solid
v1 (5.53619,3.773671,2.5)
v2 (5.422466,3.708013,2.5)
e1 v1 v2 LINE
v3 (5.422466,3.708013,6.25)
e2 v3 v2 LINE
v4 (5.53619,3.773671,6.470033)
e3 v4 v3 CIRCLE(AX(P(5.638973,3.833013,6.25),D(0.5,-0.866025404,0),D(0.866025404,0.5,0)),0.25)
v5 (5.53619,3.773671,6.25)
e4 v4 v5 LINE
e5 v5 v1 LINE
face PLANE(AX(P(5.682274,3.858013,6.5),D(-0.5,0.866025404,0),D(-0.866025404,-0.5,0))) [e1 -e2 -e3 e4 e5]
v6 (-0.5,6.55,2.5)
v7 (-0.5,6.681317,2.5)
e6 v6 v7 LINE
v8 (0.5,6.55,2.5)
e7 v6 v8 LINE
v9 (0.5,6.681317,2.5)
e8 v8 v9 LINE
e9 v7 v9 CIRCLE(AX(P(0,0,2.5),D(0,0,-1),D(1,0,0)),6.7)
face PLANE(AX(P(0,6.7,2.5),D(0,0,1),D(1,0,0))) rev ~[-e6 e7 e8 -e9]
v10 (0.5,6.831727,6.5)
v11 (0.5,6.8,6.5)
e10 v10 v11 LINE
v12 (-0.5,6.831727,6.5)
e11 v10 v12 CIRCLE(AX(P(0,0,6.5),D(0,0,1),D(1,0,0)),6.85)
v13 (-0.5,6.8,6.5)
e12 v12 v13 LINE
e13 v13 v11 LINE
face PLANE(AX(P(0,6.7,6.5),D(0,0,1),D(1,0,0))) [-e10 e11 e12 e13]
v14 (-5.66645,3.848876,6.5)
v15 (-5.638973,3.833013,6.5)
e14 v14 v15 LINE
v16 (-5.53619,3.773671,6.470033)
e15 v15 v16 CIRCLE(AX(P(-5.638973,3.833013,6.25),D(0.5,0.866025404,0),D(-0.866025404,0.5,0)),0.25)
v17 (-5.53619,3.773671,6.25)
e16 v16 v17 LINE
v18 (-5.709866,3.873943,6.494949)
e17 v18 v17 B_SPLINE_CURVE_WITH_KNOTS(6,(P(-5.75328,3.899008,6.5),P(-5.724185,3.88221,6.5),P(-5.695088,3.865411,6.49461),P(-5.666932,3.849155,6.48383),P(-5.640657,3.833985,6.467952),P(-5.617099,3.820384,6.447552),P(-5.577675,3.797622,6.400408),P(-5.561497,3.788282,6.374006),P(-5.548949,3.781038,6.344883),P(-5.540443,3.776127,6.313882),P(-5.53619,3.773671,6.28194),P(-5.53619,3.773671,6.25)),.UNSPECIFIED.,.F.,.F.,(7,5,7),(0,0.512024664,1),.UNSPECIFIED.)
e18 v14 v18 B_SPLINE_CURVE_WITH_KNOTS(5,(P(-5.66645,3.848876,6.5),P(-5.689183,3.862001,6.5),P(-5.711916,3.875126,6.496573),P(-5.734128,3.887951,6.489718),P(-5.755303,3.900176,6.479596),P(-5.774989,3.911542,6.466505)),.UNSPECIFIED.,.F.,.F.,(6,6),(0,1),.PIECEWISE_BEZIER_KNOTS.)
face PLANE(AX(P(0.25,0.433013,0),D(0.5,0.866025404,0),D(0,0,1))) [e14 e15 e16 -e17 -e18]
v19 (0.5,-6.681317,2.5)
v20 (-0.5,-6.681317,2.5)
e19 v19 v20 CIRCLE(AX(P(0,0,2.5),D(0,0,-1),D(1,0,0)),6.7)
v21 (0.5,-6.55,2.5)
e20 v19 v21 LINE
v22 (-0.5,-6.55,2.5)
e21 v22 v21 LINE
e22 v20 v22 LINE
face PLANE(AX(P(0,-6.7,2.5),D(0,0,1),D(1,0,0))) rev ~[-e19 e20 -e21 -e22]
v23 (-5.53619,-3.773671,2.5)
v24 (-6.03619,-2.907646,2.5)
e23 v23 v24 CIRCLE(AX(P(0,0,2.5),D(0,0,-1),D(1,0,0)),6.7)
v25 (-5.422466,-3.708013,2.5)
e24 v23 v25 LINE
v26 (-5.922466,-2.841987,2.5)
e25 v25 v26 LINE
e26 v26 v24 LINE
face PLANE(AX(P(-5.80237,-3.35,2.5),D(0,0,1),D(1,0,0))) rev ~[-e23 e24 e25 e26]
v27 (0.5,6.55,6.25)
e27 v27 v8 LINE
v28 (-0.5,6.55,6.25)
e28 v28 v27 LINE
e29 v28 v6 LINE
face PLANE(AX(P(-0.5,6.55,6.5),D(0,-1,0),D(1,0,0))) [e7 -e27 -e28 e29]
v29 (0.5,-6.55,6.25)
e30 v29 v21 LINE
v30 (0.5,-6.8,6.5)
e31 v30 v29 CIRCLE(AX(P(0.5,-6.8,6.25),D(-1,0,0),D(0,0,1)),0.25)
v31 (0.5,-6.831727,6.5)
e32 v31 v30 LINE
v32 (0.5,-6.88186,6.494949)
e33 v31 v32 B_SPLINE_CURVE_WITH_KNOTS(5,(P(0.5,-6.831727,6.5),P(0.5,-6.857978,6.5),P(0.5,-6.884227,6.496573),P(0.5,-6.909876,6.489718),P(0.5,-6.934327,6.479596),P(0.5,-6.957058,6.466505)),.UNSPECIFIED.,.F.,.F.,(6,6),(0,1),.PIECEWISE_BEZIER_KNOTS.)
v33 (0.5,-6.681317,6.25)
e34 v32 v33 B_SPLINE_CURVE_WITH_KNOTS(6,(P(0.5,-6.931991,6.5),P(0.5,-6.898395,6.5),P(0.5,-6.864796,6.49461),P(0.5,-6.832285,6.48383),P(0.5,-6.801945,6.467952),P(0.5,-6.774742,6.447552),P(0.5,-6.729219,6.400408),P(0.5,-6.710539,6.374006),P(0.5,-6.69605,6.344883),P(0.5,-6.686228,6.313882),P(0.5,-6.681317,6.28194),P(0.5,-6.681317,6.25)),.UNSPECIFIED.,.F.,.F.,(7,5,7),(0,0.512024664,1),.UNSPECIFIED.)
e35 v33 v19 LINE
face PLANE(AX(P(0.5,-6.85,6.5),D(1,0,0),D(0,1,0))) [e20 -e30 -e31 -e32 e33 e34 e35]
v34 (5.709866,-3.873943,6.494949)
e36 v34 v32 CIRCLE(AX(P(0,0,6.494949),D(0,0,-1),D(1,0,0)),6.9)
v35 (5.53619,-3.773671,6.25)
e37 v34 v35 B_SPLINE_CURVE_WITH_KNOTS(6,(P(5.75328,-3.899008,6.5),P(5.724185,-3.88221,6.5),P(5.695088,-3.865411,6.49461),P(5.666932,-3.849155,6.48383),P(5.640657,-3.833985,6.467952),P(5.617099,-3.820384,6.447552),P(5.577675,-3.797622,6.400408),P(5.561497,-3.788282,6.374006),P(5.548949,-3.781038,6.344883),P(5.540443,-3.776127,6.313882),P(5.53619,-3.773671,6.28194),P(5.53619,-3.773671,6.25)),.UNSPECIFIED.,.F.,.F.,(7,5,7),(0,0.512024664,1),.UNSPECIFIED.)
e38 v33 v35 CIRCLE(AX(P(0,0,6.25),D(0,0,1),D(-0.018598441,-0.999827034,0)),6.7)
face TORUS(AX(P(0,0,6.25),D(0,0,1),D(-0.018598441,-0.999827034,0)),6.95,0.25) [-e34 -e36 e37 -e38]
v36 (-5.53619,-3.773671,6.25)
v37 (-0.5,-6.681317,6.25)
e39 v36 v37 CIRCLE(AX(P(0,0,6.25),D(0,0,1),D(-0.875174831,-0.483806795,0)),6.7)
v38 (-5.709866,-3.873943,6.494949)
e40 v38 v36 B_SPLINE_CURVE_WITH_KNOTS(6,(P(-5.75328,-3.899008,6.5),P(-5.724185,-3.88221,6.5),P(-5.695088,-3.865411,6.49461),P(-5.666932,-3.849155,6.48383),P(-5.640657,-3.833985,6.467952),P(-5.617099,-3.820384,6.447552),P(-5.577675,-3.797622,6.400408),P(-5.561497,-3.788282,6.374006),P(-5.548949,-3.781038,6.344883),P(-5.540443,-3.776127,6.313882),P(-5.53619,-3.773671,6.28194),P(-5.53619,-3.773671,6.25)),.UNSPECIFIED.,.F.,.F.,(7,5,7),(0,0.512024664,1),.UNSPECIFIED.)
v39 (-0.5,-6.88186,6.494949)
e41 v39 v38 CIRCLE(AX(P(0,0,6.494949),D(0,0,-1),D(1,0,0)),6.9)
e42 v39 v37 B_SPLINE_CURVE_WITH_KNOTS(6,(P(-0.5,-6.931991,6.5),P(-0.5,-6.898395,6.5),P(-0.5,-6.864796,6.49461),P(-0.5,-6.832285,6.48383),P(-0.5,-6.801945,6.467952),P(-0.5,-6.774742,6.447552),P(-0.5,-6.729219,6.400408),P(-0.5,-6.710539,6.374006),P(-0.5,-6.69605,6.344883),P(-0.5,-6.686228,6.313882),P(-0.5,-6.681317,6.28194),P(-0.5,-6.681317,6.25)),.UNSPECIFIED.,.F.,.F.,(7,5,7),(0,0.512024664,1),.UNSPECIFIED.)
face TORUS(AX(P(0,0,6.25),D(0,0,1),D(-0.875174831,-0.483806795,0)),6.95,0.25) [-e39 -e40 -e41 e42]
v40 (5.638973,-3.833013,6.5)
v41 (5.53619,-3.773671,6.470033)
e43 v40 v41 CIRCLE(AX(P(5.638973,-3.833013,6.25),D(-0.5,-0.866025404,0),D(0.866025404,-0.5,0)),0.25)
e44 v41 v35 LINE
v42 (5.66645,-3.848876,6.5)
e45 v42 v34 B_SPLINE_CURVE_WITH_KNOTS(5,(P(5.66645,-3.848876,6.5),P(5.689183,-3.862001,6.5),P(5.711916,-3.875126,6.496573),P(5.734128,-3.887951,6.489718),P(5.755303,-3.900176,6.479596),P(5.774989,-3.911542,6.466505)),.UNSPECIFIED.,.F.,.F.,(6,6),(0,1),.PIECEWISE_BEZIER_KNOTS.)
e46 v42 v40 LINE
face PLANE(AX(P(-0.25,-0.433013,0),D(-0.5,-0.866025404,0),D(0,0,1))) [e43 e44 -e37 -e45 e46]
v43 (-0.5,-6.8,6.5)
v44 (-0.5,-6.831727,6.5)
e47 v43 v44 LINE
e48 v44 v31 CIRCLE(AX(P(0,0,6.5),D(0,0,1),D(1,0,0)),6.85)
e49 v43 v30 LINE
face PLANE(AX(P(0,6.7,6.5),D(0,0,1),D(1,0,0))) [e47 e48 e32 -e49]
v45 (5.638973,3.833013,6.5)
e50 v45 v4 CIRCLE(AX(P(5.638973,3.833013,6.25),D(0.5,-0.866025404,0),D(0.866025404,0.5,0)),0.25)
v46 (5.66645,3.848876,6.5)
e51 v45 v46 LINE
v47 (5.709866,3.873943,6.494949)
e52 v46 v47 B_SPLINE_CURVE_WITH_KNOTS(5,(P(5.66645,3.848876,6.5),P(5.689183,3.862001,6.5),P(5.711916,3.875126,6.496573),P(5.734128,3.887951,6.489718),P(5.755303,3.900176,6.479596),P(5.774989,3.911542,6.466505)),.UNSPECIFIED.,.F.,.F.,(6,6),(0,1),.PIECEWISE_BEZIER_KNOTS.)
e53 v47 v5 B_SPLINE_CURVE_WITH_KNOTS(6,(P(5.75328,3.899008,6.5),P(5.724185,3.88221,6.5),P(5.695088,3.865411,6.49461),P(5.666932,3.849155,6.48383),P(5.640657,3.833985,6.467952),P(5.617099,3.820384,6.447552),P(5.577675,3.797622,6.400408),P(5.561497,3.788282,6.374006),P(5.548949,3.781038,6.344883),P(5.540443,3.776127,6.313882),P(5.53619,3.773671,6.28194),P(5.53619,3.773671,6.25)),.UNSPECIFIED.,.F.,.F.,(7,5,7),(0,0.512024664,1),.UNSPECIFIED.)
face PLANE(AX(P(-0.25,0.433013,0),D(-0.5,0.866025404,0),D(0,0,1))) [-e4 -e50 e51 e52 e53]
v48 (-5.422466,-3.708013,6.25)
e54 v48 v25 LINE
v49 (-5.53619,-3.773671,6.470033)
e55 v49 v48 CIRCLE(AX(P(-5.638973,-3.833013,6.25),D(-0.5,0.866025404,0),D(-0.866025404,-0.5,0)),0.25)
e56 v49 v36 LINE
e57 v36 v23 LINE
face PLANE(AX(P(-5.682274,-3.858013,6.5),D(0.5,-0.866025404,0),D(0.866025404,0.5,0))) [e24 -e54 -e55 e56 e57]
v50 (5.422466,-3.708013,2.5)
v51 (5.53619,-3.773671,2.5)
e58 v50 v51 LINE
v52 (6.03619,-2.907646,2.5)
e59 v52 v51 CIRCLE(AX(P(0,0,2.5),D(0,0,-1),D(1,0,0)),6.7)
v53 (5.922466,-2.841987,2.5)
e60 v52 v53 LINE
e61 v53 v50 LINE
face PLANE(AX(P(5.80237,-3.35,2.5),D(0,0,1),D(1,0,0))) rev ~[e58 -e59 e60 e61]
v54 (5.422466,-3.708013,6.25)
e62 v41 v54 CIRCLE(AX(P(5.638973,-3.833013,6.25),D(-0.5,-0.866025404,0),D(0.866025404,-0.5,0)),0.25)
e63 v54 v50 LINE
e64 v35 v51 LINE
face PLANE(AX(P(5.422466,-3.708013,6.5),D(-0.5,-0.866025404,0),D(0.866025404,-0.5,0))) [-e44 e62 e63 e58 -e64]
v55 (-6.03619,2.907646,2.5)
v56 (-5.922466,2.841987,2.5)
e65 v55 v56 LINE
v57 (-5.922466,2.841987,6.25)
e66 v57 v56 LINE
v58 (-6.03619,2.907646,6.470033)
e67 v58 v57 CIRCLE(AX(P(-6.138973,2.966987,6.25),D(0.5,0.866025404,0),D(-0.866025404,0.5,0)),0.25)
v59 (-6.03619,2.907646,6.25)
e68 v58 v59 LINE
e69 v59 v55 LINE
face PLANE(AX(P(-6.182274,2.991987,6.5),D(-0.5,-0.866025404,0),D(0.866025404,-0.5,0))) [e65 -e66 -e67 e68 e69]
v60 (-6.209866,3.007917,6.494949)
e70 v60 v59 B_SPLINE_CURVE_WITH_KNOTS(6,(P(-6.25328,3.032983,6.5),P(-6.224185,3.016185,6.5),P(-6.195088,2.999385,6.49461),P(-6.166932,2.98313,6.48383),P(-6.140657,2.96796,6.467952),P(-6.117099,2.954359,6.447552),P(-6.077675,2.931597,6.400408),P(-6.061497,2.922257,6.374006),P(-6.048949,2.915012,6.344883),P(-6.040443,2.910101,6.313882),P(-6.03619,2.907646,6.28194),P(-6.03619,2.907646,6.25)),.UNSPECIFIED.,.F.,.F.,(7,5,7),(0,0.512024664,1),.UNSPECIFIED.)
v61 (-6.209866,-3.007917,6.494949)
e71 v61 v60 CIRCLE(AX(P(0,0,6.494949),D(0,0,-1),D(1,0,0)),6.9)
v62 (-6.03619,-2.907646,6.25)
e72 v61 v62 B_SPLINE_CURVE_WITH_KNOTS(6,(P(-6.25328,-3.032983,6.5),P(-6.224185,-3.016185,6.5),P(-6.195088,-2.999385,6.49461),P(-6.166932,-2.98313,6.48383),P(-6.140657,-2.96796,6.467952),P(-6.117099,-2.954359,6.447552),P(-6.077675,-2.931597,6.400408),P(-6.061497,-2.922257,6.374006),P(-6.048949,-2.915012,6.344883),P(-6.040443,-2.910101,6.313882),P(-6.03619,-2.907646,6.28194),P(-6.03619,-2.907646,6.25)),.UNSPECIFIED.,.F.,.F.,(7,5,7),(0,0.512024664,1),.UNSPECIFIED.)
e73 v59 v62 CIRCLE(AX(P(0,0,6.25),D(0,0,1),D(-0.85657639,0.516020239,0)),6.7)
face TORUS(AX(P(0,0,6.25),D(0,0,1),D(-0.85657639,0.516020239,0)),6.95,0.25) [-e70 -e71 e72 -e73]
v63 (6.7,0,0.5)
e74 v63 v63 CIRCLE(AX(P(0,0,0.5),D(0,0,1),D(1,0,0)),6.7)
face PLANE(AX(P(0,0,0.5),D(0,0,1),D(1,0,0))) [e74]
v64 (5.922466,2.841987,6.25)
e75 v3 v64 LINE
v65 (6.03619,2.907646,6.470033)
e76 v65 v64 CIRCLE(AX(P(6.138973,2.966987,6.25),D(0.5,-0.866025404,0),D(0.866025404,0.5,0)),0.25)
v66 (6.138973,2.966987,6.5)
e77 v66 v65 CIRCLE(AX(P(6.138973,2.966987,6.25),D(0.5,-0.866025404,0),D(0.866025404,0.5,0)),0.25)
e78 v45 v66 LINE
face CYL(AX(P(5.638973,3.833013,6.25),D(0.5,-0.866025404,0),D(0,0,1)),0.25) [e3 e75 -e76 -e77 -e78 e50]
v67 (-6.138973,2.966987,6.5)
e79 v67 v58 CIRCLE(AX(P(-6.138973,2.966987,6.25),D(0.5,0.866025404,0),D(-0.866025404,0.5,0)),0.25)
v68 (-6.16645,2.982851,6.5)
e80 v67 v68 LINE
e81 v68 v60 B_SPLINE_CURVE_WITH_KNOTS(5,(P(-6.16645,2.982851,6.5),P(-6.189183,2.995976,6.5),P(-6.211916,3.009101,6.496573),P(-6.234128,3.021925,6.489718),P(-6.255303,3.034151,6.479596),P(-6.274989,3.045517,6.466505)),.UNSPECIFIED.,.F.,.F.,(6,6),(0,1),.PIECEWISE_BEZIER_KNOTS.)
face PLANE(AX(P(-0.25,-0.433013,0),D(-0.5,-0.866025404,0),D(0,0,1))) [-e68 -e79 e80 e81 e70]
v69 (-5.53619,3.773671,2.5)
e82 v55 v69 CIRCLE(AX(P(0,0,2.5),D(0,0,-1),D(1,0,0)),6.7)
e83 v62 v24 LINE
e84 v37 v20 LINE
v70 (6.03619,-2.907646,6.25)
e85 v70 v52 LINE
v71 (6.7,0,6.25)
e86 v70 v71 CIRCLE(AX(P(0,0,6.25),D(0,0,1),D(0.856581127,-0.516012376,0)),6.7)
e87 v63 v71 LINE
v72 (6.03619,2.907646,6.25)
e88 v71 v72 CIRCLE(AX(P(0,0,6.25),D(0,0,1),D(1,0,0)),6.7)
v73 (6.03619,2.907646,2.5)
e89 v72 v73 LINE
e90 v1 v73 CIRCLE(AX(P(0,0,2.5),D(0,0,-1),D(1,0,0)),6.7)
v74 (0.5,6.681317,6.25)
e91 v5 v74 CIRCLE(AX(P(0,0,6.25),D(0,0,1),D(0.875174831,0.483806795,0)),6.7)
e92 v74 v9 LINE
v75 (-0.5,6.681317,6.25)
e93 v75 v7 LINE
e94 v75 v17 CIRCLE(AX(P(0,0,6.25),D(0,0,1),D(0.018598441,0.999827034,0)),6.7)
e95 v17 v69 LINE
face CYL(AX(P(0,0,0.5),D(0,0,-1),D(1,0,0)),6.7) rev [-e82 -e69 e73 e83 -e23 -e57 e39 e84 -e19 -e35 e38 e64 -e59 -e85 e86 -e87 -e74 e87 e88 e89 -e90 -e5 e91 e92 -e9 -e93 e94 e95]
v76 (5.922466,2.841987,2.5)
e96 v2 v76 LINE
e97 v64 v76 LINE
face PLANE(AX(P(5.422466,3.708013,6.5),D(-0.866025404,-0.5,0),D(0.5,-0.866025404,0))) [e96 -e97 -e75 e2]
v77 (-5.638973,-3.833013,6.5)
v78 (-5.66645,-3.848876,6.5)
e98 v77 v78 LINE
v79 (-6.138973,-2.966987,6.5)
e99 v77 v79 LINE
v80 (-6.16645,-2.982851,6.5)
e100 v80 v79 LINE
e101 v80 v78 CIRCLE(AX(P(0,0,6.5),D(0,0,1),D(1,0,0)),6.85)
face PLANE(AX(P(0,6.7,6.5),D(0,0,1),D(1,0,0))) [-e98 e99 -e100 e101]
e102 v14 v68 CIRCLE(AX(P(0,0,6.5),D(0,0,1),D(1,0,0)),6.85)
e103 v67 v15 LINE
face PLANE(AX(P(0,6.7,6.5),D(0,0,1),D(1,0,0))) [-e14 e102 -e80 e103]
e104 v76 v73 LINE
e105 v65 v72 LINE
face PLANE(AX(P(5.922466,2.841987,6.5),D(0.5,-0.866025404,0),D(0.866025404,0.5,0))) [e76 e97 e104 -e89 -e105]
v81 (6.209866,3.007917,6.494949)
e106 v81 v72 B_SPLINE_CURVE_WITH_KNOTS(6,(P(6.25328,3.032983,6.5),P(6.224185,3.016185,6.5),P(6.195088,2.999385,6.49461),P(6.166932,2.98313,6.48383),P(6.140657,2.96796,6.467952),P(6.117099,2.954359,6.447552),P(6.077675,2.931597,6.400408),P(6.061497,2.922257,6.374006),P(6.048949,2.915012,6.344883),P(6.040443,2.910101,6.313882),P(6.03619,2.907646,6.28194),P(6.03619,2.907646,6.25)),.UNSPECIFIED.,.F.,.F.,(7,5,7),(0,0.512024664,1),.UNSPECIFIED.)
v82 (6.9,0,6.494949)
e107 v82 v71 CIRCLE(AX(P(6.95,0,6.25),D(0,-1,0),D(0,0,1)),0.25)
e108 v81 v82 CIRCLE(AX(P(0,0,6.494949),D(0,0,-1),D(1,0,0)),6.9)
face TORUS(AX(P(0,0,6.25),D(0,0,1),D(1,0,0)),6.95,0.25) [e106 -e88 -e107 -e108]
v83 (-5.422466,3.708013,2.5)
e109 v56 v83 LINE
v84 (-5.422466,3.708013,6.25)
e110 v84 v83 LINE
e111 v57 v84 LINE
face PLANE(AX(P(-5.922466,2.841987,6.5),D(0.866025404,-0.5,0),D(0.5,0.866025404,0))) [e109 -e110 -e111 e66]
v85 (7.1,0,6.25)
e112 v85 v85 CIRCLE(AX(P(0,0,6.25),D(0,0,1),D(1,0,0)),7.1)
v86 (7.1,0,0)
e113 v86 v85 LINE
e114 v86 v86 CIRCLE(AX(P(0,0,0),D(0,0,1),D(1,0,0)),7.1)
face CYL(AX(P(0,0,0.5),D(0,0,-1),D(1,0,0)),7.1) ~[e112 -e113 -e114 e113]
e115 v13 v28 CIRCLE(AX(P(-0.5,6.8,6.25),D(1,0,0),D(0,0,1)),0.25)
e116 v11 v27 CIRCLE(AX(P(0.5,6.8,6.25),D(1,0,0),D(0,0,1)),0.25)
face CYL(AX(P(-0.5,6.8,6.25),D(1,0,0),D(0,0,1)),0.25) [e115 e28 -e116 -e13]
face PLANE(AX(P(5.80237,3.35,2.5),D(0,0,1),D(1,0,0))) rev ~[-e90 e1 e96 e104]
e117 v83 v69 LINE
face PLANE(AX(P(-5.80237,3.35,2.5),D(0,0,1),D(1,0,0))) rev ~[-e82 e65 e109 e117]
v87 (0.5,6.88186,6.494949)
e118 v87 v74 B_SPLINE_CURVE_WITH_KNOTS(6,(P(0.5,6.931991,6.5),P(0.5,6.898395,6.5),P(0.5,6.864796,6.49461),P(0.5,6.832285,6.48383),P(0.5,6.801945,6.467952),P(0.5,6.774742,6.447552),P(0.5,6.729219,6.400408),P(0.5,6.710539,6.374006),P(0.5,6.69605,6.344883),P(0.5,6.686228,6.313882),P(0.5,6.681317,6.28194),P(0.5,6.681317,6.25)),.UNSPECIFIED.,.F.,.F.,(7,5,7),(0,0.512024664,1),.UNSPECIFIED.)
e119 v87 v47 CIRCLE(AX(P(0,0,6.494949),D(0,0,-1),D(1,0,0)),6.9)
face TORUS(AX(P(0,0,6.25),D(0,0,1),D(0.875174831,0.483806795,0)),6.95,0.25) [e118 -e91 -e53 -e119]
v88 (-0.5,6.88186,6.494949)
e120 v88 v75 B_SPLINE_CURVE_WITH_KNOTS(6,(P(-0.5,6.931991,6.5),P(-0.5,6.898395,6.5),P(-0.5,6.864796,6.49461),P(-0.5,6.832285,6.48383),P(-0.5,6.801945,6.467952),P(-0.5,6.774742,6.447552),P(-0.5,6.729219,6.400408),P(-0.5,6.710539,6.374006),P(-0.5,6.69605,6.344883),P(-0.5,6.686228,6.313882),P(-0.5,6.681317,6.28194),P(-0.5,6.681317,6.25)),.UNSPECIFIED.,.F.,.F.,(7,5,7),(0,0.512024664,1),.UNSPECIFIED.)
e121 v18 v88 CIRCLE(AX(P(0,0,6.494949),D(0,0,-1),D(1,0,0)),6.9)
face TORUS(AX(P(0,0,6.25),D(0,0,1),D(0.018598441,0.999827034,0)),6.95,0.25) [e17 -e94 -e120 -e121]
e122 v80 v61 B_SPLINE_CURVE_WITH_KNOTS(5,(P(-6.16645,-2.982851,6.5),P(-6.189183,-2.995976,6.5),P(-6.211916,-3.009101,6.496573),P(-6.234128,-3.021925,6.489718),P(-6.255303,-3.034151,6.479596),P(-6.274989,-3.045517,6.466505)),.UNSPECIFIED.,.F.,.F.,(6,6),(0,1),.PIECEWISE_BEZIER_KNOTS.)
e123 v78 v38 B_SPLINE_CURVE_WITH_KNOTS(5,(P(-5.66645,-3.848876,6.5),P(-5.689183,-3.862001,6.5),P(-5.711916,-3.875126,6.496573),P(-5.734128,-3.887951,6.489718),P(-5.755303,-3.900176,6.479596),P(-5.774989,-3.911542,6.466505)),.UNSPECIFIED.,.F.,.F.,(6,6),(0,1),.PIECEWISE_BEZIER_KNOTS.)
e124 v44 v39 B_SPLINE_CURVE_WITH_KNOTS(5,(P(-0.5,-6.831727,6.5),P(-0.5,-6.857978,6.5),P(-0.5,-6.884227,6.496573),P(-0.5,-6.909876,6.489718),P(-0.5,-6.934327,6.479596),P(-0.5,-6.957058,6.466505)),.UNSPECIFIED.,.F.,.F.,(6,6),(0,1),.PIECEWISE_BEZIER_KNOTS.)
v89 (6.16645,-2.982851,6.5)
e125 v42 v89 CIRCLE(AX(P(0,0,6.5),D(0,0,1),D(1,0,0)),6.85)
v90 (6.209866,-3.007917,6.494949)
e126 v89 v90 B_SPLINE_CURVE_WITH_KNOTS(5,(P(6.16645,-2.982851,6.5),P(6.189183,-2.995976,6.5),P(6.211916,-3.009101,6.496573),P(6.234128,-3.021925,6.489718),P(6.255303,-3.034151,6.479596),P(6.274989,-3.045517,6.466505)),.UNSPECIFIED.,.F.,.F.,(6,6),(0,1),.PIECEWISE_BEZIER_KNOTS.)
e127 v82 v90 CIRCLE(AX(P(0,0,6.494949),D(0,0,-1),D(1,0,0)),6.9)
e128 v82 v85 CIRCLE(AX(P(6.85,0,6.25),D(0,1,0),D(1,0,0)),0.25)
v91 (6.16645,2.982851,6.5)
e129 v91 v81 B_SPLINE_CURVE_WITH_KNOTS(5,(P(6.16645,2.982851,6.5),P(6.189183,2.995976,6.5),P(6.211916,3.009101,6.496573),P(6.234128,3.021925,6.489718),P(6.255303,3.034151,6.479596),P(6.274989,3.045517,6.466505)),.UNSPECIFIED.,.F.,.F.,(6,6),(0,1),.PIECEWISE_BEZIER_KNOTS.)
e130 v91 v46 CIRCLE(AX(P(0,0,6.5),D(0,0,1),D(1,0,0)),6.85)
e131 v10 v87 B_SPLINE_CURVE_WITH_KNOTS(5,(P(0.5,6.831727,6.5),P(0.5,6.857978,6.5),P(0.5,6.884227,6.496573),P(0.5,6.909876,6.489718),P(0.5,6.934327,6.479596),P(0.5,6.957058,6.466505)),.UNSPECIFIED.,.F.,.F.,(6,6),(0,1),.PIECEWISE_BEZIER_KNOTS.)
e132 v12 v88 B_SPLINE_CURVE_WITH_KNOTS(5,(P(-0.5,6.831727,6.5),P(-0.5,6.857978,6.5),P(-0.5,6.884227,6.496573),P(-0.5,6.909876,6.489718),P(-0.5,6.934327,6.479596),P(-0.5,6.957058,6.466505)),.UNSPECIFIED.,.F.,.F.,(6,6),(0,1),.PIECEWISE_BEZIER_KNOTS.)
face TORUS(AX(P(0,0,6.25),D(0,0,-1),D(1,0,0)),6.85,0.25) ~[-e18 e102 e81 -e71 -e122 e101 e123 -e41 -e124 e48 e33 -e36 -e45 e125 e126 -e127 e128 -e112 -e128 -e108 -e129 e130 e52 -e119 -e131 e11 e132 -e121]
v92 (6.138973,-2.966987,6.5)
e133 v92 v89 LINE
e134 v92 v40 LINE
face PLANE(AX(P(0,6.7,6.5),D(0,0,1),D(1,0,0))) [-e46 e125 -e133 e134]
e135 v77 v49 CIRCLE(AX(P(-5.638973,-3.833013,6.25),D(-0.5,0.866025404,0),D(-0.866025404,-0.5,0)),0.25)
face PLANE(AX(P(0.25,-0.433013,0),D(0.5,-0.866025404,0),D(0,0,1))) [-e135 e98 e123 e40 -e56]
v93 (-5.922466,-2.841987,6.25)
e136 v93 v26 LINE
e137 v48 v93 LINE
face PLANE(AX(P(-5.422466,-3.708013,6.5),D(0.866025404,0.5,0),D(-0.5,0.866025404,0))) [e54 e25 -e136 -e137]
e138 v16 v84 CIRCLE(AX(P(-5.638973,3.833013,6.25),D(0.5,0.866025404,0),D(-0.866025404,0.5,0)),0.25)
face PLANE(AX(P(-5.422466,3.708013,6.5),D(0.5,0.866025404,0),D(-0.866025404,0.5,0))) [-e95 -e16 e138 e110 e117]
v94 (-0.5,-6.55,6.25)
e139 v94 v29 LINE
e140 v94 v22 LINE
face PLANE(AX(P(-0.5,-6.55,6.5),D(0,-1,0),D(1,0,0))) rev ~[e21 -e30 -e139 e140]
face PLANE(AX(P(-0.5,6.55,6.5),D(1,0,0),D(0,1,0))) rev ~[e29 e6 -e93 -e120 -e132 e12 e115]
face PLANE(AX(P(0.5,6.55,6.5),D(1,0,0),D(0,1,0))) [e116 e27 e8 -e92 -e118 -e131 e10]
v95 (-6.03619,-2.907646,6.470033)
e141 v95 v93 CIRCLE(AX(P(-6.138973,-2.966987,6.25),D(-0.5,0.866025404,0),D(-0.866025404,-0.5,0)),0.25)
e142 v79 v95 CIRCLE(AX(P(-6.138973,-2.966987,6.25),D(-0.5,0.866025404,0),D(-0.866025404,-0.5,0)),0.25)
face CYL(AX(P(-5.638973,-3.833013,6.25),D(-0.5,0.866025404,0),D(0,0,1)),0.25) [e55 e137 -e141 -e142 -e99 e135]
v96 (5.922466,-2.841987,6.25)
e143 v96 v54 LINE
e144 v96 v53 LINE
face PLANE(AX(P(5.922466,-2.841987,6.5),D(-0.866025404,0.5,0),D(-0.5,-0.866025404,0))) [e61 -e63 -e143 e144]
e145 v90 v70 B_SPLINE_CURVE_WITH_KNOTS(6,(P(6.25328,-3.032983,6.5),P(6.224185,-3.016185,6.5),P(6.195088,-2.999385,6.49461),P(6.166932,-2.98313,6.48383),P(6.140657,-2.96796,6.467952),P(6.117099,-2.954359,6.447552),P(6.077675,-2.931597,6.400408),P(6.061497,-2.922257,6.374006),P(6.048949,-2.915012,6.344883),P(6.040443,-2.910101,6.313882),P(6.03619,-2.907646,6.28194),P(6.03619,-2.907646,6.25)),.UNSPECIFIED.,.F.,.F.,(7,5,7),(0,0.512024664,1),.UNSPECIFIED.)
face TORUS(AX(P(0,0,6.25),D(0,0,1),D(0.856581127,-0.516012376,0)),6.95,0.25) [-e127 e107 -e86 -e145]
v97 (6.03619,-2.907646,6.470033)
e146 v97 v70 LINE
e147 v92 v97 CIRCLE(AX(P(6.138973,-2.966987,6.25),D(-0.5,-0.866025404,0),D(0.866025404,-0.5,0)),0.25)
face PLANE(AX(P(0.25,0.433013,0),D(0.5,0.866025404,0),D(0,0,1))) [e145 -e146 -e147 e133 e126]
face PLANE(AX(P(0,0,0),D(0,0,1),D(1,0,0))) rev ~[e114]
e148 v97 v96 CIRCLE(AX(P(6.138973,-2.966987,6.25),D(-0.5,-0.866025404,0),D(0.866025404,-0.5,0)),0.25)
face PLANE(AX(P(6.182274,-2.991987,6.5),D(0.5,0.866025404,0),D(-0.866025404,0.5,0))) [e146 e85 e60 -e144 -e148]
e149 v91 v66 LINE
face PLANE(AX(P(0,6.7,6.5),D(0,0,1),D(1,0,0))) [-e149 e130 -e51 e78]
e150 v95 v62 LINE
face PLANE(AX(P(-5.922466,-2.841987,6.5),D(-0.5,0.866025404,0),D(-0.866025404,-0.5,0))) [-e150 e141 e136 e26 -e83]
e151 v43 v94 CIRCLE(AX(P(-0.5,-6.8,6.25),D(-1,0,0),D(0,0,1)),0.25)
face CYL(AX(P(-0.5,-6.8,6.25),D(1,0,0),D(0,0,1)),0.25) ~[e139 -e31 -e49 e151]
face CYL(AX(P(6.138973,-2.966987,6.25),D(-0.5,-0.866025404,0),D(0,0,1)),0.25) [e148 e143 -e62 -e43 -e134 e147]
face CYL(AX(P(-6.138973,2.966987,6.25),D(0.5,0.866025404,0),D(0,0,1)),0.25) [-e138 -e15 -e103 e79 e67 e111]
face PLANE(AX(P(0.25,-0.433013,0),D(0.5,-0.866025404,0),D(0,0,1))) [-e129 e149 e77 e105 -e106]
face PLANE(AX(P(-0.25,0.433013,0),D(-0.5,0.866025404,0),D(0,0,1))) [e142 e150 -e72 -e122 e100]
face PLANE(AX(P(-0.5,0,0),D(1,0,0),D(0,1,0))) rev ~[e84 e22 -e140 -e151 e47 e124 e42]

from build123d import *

# Parameters (mm, degrees)
F0_R         = 7.1
F1_DEPTH     = 0.5
F2_R         = 7.1
F2_R_2       = 6.7
F3_DEPTH     = 6
F4_W         = 1
F4_H         = 0.3
F5_DEPTH     = 4
F6_R         = 0.25
F7_T4_ANGLE  = 62.1313472273
F7_T10_ANGLE = 62.1313472273
F7_T16_ANGLE = 62.1313472273
F7_T22_ANGLE = 62.1313472273
F7_T28_ANGLE = 31.0651476548
F7_T33_ANGLE = 62.1313472273
F7_T39_ANGLE = 31.0651476548
F8_R         = 0.25


# Not quite as in the source:
# - a fillet or chamfer that OpenCascade refuses, or shapes differently, is made with other operations: its cross-section is extruded or revolved along the edge and cut away or added


with BuildPart() as f1:
    # F0 (on Top) → F1 (new body)
    with BuildSketch(Plane.XY):
        Circle(F0_R)
    extrude(amount=F1_DEPTH)

    # F2 (on face) → F3 (join)
    with BuildSketch(Plane.XY.offset(0.5)):
        Circle(F2_R)
        Circle(F2_R_2, mode=Mode.SUBTRACT)
    extrude(amount=F3_DEPTH)

    # F4 (on face) → F5 (join)
    with BuildSketch(Plane.XY.offset(6.5)):
        with Locations((0, 6.7)):
            Rectangle(F4_W, F4_H)
        Polygon((-5.9224663948, 2.8419872981), (-5.4224663948, 3.7080127019), (-5.6822740159, 3.8580127019), (-6.1822740159, 2.9919872981), align=None)
        Polygon((-5.4224663948, -3.7080127019), (-5.9224663948, -2.8419872981), (-6.1822740159, -2.9919872981), (-5.6822740159, -3.8580127019), align=None)
        with Locations((0, -6.7)):
            Rectangle(F4_W, F4_H)
        Polygon((5.9224663948, -2.8419872981), (5.4224663948, -3.7080127019), (5.6822740159, -3.8580127019), (6.1822740159, -2.9919872981), align=None)
        Polygon((5.4224663948, 3.7080127019), (5.9224663948, 2.8419872981), (6.1822740159, 2.9919872981), (5.6822740159, 3.8580127019), align=None)
    extrude(amount=-F5_DEPTH)

    # F6
    f6_edges = [f1.edges().sort_by_distance(p)[0] for p in [
        (-7.1, 0, 6.5),
    ]]
    fillet(f6_edges, radius=F6_R)

    # F7: fillet of radius 0.25 on 6 edges, made by hand


with BuildPart() as f7_tool2:
    # F7_s3 → F7_t4 (revolve)
    with BuildSketch(Plane(origin=(0, 0, 0), x_dir=(0, 0, 1), z_dir=(-0.4838067947, 0.8751748313, 0))):
        with BuildLine():
            ThreePointArc((6.5, -6.95), (6.4267766953, -6.7732233047), (6.25, -6.7))
            Line((6.25, -6.7), (6.5, -6.7))
            Line((6.5, -6.7), (6.5, -6.95))
        make_face()
    revolve(axis=Axis((0, 0, 6.5), (0, 0, 1)), revolution_arc=F7_T4_ANGLE)

    split(bisect_by=Plane.YZ.offset(-0.5), keep=Keep.BOTTOM)

    split(bisect_by=Plane(origin=(0.25, -0.4330127019, 0), x_dir=(0, 0, 1), z_dir=(0.5, -0.8660254038, 0)), keep=Keep.TOP)


with BuildPart() as f1_1:
    add(f1.part)

    # F7_t1: cut F7_tool2
    add(f7_tool2.part, mode=Mode.SUBTRACT)


with BuildPart() as f7_tool8:
    # F7_s9 → F7_t10 (revolve)
    with BuildSketch(Plane(origin=(0, 0, 0), x_dir=(0, 0, 1), z_dir=(0.5160202393, 0.8565763904, 0))):
        with BuildLine():
            ThreePointArc((6.5, -6.95), (6.4267766953, -6.7732233047), (6.25, -6.7))
            Line((6.25, -6.7), (6.5, -6.7))
            Line((6.5, -6.7), (6.5, -6.95))
        make_face()
    revolve(axis=Axis((0, 0, 6.5), (0, 0, 1)), revolution_arc=F7_T10_ANGLE)

    split(bisect_by=Plane(origin=(-0.25, 0.4330127019, 0), x_dir=(0, 0, 1), z_dir=(-0.5, 0.8660254038, 0)), keep=Keep.TOP)

    split(bisect_by=Plane(origin=(-0.25, -0.4330127019, 0), x_dir=(0, 0, 1), z_dir=(-0.5, -0.8660254038, 0)), keep=Keep.TOP)


with BuildPart() as f1_2:
    add(f1_1.part)

    # F7_t7: cut F7_tool8
    add(f7_tool8.part, mode=Mode.SUBTRACT)


with BuildPart() as f7_tool14:
    # F7_s15 → F7_t16 (revolve)
    with BuildSketch(Plane(origin=(0, 0, 0), x_dir=(0, 0, 1), z_dir=(0.999827034, -0.0185984409, 0))):
        with BuildLine():
            ThreePointArc((6.5, -6.95), (6.4267766953, -6.7732233047), (6.25, -6.7))
            Line((6.25, -6.7), (6.5, -6.7))
            Line((6.5, -6.7), (6.5, -6.95))
        make_face()
    revolve(axis=Axis((0, 0, 6.5), (0, 0, 1)), revolution_arc=F7_T16_ANGLE)

    split(bisect_by=Plane(origin=(0.25, 0.4330127019, 0), x_dir=(0, 0, 1), z_dir=(0.5, 0.8660254038, 0)), keep=Keep.TOP)

    split(bisect_by=Plane.YZ.offset(-0.5), keep=Keep.BOTTOM)


with BuildPart() as f1_3:
    add(f1_2.part)

    # F7_t13: cut F7_tool14
    add(f7_tool14.part, mode=Mode.SUBTRACT)


with BuildPart() as f7_tool20:
    # F7_s21 → F7_t22 (revolve)
    with BuildSketch(Plane(origin=(0, 0, 0), x_dir=(0, 0, 1), z_dir=(0.4838067947, -0.8751748313, 0))):
        with BuildLine():
            ThreePointArc((6.5, -6.95), (6.4267766953, -6.7732233047), (6.25, -6.7))
            Line((6.25, -6.7), (6.5, -6.7))
            Line((6.5, -6.7), (6.5, -6.95))
        make_face()
    revolve(axis=Axis((0, 0, 6.5), (0, 0, 1)), revolution_arc=F7_T22_ANGLE)

    split(bisect_by=Plane.YZ.offset(0.5), keep=Keep.TOP)

    split(bisect_by=Plane(origin=(-0.25, 0.4330127019, 0), x_dir=(0, 0, 1), z_dir=(-0.5, 0.8660254038, 0)), keep=Keep.TOP)


with BuildPart() as f1_4:
    add(f1_3.part)

    # F7_t19: cut F7_tool20
    add(f7_tool20.part, mode=Mode.SUBTRACT)


with BuildPart() as f7_tool26:
    # F7_s27 → F7_t28 (revolve)
    with BuildSketch(Plane(origin=(0, 0, 0), x_dir=(0, 0, 1), z_dir=(-0.5160123762, -0.8565811273, 0))):
        with BuildLine():
            ThreePointArc((6.5, -6.95), (6.4267766953, -6.7732233047), (6.25, -6.7))
            Line((6.25, -6.7), (6.5, -6.7))
            Line((6.5, -6.7), (6.5, -6.95))
        make_face()
    revolve(axis=Axis((0, 0, 6.5), (0, 0, 1)), revolution_arc=F7_T28_ANGLE)

    split(bisect_by=Plane(origin=(0.25, 0.4330127019, 0), x_dir=(0, 0, 1), z_dir=(0.5, 0.8660254038, 0)), keep=Keep.TOP)


with BuildPart() as f1_5:
    add(f1_4.part)

    # F7_t25: cut F7_tool26
    add(f7_tool26.part, mode=Mode.SUBTRACT)


with BuildPart() as f7_tool31:
    # F7_s32 → F7_t33 (revolve)
    with BuildSketch(Plane(origin=(0, 0, 0), x_dir=(0, 0, 1), z_dir=(-0.999827034, 0.0185984409, 0))):
        with BuildLine():
            ThreePointArc((6.5, -6.95), (6.4267766953, -6.7732233047), (6.25, -6.7))
            Line((6.25, -6.7), (6.5, -6.7))
            Line((6.5, -6.7), (6.5, -6.95))
        make_face()
    revolve(axis=Axis((0, 0, 6.5), (0, 0, 1)), revolution_arc=F7_T33_ANGLE)

    split(bisect_by=Plane(origin=(-0.25, -0.4330127019, 0), x_dir=(0, 0, 1), z_dir=(-0.5, -0.8660254038, 0)), keep=Keep.TOP)

    split(bisect_by=Plane.YZ.offset(0.5), keep=Keep.TOP)


with BuildPart() as f1_6:
    add(f1_5.part)

    # F7_t30: cut F7_tool31
    add(f7_tool31.part, mode=Mode.SUBTRACT)


with BuildPart() as f7_tool37:
    # F7_s38 → F7_t39 (revolve)
    with BuildSketch(Plane.XZ):
        with BuildLine():
            ThreePointArc((6.95, 6.5), (6.7732233047, 6.4267766953), (6.7, 6.25))
            Line((6.7, 6.25), (6.7, 6.5))
            Line((6.7, 6.5), (6.95, 6.5))
        make_face()
    revolve(axis=Axis((0, 0, 6.5), (0, 0, 1)), revolution_arc=F7_T39_ANGLE)

    split(bisect_by=Plane(origin=(0.25, -0.4330127019, 0), x_dir=(0, 0, 1), z_dir=(0.5, -0.8660254038, 0)), keep=Keep.TOP)


with BuildPart() as f1_7:
    add(f1_6.part)

    # F7_t36: cut F7_tool37
    add(f7_tool37.part, mode=Mode.SUBTRACT)

    # F8
    f8_edges = [f1_7.edges().sort_by_distance(p)[0] for p in [
        (-5.672466, 3.275, 6.5),
        (0, 6.55, 6.5),
        (5.672466, 3.275, 6.5),
        (5.672466, -3.275, 6.5),
        (0, -6.55, 6.5),
        (-5.672466, -3.275, 6.5),
    ]]
    fillet(f8_edges, radius=F8_R)


solid = f1_7.part
